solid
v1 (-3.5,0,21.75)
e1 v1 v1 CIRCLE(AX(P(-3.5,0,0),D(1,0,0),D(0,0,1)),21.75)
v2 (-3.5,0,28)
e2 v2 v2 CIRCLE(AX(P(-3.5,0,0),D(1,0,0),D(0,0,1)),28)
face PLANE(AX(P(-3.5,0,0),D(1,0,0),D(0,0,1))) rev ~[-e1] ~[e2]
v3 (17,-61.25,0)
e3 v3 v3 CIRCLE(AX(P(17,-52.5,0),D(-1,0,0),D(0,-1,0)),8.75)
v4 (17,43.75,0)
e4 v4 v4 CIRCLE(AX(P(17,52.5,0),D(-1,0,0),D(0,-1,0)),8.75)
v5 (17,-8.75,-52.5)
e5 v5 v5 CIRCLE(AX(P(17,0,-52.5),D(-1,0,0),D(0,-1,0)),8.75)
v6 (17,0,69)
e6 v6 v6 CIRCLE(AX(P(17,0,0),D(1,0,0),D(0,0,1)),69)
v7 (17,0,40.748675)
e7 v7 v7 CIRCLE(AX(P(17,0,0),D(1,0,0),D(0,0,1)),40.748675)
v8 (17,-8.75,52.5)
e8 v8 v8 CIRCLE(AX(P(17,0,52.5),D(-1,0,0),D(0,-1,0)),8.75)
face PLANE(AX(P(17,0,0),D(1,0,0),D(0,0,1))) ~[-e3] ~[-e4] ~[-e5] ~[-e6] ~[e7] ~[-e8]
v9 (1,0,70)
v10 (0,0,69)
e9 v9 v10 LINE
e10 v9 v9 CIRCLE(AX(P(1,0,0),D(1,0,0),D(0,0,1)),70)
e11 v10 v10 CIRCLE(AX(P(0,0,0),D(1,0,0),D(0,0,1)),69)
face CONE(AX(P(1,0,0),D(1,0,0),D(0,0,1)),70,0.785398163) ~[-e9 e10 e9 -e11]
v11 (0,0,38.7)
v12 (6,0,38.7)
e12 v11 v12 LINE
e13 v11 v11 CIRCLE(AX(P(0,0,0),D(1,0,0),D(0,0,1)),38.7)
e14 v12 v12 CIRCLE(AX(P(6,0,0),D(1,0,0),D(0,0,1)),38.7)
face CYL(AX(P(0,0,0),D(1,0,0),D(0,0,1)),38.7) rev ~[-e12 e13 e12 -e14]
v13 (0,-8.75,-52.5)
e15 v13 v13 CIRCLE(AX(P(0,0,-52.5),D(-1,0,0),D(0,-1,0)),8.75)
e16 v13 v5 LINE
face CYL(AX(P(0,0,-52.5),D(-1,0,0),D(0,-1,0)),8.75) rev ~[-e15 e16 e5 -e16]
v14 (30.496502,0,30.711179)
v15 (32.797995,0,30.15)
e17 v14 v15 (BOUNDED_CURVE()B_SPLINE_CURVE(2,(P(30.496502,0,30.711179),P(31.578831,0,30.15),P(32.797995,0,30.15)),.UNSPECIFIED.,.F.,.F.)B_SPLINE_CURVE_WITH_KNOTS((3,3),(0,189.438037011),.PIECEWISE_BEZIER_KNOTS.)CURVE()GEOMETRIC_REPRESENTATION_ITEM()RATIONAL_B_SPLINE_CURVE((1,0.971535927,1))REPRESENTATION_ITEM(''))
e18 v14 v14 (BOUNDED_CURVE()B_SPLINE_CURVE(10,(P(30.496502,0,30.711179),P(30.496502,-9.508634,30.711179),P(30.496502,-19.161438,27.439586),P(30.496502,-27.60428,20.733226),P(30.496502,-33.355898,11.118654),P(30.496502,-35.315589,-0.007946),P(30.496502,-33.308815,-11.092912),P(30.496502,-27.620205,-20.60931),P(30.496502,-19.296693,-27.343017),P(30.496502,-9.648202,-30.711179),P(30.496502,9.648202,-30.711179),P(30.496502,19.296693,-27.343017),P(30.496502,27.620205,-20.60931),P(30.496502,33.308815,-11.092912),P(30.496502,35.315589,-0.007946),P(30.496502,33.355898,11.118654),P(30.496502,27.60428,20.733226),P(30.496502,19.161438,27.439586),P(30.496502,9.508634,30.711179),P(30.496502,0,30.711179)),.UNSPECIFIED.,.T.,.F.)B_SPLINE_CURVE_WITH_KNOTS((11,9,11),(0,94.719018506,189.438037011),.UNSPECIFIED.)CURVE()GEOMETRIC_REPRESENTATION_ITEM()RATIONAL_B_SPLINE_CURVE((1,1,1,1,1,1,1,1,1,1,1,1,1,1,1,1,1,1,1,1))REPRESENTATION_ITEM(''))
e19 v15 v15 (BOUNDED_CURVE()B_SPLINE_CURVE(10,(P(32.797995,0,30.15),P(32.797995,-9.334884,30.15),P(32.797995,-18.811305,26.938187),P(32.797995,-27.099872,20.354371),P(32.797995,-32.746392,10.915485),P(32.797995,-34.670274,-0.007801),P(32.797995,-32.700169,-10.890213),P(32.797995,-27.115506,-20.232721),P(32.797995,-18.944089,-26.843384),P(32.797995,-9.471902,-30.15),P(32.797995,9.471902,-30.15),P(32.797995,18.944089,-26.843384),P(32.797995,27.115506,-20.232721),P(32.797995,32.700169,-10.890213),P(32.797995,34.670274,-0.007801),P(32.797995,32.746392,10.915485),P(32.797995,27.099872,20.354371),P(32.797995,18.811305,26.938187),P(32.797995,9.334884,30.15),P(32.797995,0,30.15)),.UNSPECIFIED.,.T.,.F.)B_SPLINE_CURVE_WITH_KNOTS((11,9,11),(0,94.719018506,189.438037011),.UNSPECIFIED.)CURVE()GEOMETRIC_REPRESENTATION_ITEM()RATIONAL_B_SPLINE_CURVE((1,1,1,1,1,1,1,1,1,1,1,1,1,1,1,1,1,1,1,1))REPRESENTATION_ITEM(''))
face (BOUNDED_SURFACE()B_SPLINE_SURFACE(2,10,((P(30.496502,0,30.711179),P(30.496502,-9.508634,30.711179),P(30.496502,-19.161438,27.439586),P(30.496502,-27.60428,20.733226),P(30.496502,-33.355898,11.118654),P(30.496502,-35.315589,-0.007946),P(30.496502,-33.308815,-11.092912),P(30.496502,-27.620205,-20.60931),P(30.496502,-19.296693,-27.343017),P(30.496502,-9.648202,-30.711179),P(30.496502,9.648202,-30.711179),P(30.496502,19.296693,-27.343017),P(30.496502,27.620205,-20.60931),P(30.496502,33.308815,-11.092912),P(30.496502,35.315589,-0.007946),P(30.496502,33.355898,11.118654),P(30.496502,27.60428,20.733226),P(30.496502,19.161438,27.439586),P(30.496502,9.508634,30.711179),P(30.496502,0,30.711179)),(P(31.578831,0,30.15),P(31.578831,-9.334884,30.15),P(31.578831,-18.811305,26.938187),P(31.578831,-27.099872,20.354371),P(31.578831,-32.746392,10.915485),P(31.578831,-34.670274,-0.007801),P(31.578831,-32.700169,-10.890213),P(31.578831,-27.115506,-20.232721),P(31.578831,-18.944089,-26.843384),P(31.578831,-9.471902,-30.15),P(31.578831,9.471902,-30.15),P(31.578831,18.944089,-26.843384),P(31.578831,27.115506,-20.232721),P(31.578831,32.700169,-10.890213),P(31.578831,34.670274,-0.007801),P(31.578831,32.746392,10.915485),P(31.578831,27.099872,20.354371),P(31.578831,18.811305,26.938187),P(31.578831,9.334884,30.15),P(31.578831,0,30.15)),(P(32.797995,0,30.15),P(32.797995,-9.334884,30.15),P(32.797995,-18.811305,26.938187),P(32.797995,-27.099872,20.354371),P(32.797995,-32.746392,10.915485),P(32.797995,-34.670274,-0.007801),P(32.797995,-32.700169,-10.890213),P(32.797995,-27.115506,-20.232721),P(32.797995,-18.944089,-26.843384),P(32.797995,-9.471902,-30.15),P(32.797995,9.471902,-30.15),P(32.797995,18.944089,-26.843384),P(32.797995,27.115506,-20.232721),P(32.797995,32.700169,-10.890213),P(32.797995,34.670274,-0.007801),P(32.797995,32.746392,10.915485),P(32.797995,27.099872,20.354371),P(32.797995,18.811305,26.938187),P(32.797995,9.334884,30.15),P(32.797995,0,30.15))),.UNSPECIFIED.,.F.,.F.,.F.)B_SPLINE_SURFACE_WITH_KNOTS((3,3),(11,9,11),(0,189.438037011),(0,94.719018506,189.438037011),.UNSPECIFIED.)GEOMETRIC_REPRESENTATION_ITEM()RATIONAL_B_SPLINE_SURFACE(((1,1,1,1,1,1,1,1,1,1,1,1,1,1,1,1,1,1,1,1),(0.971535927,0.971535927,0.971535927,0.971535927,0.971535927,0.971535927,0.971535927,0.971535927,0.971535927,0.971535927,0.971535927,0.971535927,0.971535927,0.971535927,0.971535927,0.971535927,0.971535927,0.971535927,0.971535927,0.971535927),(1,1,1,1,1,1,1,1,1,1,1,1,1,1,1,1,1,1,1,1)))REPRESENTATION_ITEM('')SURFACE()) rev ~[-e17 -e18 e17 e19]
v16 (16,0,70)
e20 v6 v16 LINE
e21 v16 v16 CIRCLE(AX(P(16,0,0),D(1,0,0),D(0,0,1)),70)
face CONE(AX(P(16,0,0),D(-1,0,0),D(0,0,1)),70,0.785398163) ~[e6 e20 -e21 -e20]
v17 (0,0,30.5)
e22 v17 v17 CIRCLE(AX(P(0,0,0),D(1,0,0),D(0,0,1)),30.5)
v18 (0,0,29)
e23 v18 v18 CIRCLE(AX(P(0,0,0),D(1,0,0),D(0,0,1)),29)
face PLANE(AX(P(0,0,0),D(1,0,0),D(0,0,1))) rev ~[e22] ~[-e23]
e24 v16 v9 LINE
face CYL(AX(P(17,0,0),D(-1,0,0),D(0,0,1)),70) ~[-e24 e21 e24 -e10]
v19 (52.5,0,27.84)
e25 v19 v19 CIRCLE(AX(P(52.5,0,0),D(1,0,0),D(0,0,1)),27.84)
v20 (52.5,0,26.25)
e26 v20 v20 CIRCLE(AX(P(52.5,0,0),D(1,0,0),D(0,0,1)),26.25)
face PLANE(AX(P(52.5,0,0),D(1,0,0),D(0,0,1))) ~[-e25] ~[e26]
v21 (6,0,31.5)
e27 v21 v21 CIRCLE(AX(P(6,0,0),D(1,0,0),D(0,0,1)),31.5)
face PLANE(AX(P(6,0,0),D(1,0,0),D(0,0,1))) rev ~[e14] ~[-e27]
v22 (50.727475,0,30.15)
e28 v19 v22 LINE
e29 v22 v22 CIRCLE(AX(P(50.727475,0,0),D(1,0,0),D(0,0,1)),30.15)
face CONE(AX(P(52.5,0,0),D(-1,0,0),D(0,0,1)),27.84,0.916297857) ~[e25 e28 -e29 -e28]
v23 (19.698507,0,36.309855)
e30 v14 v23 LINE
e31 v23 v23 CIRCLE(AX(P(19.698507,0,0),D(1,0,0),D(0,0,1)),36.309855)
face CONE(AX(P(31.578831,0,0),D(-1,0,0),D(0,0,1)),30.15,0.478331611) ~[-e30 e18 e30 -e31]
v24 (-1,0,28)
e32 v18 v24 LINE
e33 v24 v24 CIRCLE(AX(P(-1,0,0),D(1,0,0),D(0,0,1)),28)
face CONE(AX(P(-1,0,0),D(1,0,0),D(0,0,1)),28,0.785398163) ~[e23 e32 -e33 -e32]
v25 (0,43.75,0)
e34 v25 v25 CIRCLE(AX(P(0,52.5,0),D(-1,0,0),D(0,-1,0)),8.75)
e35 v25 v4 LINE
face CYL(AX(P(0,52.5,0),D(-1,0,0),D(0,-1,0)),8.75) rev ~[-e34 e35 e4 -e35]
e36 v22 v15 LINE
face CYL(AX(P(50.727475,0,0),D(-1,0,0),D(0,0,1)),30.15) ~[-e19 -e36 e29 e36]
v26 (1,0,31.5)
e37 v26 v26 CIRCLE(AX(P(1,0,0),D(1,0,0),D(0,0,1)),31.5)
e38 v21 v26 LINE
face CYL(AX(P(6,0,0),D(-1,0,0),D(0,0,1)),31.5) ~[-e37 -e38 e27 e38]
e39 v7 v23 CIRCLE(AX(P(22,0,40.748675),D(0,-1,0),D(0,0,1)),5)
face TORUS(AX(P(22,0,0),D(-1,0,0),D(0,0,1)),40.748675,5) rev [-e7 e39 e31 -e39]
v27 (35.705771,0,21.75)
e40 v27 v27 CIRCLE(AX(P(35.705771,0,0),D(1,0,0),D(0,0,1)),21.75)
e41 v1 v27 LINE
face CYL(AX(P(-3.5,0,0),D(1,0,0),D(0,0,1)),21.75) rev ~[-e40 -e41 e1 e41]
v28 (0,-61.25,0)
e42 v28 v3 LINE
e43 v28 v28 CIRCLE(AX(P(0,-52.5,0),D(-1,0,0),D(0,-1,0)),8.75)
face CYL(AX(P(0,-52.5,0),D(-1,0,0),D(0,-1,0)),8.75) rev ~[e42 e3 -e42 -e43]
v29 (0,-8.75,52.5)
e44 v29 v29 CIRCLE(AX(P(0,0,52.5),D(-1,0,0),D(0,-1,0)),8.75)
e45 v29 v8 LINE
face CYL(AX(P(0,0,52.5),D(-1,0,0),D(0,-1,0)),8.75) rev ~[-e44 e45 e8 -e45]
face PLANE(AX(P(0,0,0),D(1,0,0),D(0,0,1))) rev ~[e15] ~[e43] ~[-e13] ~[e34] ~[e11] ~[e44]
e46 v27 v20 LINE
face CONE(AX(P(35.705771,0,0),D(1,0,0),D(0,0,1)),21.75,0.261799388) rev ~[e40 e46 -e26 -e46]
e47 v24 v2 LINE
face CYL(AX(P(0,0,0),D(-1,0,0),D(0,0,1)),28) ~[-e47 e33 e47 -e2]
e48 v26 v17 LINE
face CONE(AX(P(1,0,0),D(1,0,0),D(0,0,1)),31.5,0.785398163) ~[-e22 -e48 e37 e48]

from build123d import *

# Parameters (mm, degrees)
F2_SIZE  = 1
F4_R     = 5
F5_R     = 8.75
F6_DEPTH = 52.501


# Not quite as in the source:
# - two fillets or chamfers of one size are made in one step


with BuildPart() as f1:
    # F0 (on Front) → F1 (revolve)
    with BuildSketch(Plane.XZ):
        Polygon((-3.5, 21.75), (35.7057713659, 21.75), (52.5, 26.25), (52.5, 27.84), (50.7274746578, 30.15), (31.5788313746, 30.15), (17, 37.7090089023), (17, 70), (0, 70), (0, 38.7), (6, 38.7), (6, 31.5), (0, 31.5), (0, 28), (-3.5, 28), align=None)
    revolve(axis=Axis((44.485598996, 0, 0), (1, 0, 0)))

    # F2
    f2_edges = [f1.edges().sort_by_distance(p)[0] for p in [
        (17, 0, -70),
        (0, 0, -70),
        (0, 0, -31.5),
        (0, 0, -28),
    ]]
    chamfer(f2_edges, length=F2_SIZE)

    # F4
    f4_edges = [f1.edges().sort_by_distance(p)[0] for p in [
        (17, 0, -37.709009),
        (31.578831, 0, -30.15),
    ]]
    fillet(f4_edges, radius=F4_R)

    # F5 (on face) → F6 (cut, through all)
    with BuildSketch(Plane(origin=(0, 0, 0), x_dir=(0, -1, 0), z_dir=(-1, 0, 0))):
        with Locations((0, 52.5)):
            Circle(F5_R)
        with Locations((-52.5, 0)):
            Circle(F5_R)
        with Locations((52.5, 0)):
            Circle(F5_R)
        with Locations((0, -52.5)):
            Circle(F5_R)
    extrude(amount=-F6_DEPTH, mode=Mode.SUBTRACT)


solid = f1.part
